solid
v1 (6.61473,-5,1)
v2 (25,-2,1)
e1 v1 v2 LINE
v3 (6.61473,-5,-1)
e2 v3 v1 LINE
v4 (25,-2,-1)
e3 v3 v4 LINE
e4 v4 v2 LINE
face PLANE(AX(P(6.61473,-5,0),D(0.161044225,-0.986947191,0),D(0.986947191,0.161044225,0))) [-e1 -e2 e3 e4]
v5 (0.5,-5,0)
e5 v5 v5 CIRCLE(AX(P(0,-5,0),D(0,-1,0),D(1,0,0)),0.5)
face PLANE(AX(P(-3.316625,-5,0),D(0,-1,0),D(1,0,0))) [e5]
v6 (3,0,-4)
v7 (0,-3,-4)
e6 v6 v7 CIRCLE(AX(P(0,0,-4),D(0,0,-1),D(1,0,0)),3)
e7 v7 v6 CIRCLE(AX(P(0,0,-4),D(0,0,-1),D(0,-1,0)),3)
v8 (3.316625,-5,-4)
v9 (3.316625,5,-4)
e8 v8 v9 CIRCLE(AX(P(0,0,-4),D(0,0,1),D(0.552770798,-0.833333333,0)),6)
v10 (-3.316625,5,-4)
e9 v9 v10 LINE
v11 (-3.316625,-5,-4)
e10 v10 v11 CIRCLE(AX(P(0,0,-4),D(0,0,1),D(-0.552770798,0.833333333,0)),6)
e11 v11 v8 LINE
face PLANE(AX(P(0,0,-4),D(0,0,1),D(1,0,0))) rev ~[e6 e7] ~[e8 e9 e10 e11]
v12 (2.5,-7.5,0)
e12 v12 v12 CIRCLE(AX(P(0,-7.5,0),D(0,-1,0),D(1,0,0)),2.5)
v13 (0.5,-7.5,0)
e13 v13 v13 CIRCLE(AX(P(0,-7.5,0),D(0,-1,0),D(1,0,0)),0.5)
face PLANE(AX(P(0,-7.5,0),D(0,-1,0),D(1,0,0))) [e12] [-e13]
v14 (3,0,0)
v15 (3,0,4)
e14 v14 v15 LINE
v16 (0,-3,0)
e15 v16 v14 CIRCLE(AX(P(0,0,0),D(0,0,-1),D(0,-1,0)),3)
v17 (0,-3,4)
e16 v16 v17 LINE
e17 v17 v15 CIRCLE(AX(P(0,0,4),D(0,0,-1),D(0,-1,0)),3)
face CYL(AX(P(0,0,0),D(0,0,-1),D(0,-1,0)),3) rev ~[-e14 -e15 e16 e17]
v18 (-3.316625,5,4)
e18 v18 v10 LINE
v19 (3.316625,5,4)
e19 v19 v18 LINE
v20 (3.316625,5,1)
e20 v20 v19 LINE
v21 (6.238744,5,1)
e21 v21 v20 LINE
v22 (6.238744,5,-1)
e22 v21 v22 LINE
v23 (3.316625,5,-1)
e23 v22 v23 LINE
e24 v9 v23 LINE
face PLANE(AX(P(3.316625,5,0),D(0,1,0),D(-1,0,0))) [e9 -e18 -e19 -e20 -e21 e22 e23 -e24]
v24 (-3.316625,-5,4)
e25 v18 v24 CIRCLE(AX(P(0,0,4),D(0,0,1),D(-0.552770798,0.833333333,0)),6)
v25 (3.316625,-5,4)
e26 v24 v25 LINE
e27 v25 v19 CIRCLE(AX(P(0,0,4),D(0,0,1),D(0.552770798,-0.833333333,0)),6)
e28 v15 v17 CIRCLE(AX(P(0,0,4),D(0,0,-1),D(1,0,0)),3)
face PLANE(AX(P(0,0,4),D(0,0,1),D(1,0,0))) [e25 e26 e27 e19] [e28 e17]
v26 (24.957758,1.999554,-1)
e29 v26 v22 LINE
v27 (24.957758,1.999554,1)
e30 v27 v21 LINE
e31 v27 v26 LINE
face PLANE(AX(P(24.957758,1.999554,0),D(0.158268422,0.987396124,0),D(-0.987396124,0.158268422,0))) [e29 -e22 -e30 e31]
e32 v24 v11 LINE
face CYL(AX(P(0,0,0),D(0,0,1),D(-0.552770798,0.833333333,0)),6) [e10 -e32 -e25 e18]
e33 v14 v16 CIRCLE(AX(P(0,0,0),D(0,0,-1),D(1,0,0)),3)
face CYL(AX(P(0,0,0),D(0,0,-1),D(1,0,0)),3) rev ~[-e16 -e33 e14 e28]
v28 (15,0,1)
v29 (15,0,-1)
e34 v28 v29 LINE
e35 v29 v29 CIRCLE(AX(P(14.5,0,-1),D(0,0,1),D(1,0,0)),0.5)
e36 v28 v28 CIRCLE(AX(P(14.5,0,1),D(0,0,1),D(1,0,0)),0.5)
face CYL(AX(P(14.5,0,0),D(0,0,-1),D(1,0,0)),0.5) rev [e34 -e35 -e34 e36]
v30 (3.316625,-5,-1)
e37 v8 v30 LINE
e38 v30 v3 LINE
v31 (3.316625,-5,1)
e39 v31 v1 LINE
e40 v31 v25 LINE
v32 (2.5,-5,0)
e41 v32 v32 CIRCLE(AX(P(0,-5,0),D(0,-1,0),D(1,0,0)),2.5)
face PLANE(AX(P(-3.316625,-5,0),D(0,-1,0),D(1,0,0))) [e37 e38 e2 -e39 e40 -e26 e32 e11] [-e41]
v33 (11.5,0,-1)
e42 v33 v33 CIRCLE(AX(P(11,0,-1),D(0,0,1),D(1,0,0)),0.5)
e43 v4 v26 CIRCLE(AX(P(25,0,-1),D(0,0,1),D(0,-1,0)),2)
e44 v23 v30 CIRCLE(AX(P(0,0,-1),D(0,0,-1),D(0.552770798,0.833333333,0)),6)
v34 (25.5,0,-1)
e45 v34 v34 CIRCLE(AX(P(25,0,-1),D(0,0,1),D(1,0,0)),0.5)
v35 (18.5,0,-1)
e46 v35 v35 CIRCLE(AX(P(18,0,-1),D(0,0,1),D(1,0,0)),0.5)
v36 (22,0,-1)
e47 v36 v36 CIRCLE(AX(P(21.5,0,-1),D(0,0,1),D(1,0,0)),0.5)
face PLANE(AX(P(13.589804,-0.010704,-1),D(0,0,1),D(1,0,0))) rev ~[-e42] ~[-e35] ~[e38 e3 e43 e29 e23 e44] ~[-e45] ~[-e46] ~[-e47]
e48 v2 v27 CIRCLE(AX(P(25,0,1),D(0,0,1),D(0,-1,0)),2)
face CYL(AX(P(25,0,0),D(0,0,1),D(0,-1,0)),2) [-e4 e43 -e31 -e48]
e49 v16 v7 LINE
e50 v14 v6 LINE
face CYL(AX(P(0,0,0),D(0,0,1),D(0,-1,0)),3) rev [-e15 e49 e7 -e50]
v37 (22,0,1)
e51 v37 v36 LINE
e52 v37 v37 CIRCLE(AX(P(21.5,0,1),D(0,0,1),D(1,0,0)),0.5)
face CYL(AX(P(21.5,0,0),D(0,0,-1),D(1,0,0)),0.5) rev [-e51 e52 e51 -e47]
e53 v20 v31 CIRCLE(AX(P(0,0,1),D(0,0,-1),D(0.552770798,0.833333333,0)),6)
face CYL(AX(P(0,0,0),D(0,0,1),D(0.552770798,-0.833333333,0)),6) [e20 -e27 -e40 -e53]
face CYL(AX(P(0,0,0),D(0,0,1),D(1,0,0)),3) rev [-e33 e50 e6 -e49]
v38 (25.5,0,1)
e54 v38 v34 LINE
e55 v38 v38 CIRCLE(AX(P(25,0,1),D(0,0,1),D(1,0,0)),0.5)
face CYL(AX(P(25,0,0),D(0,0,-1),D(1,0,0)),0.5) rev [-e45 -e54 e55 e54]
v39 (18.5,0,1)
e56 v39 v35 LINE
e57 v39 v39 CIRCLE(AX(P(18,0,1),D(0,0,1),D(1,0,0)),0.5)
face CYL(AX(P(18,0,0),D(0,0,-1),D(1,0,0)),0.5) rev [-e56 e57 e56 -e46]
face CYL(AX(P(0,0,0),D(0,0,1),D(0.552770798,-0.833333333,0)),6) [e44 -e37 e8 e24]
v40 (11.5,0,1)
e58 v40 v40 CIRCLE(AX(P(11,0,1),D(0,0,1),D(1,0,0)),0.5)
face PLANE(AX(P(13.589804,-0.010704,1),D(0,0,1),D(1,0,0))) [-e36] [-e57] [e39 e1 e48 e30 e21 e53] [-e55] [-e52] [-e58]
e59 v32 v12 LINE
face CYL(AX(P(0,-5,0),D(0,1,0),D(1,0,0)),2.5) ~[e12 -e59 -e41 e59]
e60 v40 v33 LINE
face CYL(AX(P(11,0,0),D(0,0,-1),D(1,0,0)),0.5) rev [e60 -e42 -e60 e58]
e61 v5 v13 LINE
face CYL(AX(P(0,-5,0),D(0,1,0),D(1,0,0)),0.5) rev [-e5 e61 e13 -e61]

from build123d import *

# Parameters (mm, degrees)
F1_DEPTH = 4
F0_R     = 0.5
F2_DEPTH = 1
F3_R     = 2.5
F3_R_2   = 0.5
F4_DEPTH = 2.5


with BuildPart() as f1:
    # F0 (on Top) → F1 (new body, symmetric)
    with BuildSketch(Plane.XY):
        with BuildLine():
            Line((-3.3166247904, -5), (0, -5))
            Line((0, -5), (3.3166247904, -5))
            ThreePointArc((3.3166247904, -5), (6, 0), (3.3166247904, 5))
            Line((3.3166247904, 5), (-3.3166247904, 5))
            ThreePointArc((-3.3166247904, 5), (-6, 0), (-3.3166247904, -5))
        make_face()
        with BuildLine():
            ThreePointArc((0, -3), (-2.1213203436, 2.1213203436), (3, 0))
            ThreePointArc((3, 0), (2.1213203436, -2.1213203436), (0, -3))
        make_face(mode=Mode.SUBTRACT)
    extrude(amount=F1_DEPTH, both=True)

    # F0 (on Top) → F2 (join, symmetric)
    with BuildSketch(Plane.XY):
        with BuildLine():
            ThreePointArc((3.3166247904, 5), (6, 0), (3.3166247904, -5))
            Line((3.3166247904, -5), (6.6147298804, -5))
            Line((6.6147298804, -5), (25, -2))
            ThreePointArc((25, -2), (26.9998884615, 0.0211220617), (24.9577582326, 1.9995538585))
            Line((24.9577582326, 1.9995538585), (6.2387437176, 5))
            Line((6.2387437176, 5), (3.3166247904, 5))
        make_face()
        with Locations((11, 0)):
            Circle(F0_R, mode=Mode.SUBTRACT)
        with Locations((14.5, 0)):
            Circle(F0_R, mode=Mode.SUBTRACT)
        with Locations((18, 0)):
            Circle(F0_R, mode=Mode.SUBTRACT)
        with Locations((21.5, 0)):
            Circle(F0_R, mode=Mode.SUBTRACT)
        with Locations((25, 0)):
            Circle(F0_R, mode=Mode.SUBTRACT)
    extrude(amount=F2_DEPTH, both=True)

    # F3 (on face) → F4 (join)
    with BuildSketch(Plane.XZ.offset(5)):
        Circle(F3_R)
        Circle(F3_R_2, mode=Mode.SUBTRACT)
    extrude(amount=F4_DEPTH)


solid = f1.part
